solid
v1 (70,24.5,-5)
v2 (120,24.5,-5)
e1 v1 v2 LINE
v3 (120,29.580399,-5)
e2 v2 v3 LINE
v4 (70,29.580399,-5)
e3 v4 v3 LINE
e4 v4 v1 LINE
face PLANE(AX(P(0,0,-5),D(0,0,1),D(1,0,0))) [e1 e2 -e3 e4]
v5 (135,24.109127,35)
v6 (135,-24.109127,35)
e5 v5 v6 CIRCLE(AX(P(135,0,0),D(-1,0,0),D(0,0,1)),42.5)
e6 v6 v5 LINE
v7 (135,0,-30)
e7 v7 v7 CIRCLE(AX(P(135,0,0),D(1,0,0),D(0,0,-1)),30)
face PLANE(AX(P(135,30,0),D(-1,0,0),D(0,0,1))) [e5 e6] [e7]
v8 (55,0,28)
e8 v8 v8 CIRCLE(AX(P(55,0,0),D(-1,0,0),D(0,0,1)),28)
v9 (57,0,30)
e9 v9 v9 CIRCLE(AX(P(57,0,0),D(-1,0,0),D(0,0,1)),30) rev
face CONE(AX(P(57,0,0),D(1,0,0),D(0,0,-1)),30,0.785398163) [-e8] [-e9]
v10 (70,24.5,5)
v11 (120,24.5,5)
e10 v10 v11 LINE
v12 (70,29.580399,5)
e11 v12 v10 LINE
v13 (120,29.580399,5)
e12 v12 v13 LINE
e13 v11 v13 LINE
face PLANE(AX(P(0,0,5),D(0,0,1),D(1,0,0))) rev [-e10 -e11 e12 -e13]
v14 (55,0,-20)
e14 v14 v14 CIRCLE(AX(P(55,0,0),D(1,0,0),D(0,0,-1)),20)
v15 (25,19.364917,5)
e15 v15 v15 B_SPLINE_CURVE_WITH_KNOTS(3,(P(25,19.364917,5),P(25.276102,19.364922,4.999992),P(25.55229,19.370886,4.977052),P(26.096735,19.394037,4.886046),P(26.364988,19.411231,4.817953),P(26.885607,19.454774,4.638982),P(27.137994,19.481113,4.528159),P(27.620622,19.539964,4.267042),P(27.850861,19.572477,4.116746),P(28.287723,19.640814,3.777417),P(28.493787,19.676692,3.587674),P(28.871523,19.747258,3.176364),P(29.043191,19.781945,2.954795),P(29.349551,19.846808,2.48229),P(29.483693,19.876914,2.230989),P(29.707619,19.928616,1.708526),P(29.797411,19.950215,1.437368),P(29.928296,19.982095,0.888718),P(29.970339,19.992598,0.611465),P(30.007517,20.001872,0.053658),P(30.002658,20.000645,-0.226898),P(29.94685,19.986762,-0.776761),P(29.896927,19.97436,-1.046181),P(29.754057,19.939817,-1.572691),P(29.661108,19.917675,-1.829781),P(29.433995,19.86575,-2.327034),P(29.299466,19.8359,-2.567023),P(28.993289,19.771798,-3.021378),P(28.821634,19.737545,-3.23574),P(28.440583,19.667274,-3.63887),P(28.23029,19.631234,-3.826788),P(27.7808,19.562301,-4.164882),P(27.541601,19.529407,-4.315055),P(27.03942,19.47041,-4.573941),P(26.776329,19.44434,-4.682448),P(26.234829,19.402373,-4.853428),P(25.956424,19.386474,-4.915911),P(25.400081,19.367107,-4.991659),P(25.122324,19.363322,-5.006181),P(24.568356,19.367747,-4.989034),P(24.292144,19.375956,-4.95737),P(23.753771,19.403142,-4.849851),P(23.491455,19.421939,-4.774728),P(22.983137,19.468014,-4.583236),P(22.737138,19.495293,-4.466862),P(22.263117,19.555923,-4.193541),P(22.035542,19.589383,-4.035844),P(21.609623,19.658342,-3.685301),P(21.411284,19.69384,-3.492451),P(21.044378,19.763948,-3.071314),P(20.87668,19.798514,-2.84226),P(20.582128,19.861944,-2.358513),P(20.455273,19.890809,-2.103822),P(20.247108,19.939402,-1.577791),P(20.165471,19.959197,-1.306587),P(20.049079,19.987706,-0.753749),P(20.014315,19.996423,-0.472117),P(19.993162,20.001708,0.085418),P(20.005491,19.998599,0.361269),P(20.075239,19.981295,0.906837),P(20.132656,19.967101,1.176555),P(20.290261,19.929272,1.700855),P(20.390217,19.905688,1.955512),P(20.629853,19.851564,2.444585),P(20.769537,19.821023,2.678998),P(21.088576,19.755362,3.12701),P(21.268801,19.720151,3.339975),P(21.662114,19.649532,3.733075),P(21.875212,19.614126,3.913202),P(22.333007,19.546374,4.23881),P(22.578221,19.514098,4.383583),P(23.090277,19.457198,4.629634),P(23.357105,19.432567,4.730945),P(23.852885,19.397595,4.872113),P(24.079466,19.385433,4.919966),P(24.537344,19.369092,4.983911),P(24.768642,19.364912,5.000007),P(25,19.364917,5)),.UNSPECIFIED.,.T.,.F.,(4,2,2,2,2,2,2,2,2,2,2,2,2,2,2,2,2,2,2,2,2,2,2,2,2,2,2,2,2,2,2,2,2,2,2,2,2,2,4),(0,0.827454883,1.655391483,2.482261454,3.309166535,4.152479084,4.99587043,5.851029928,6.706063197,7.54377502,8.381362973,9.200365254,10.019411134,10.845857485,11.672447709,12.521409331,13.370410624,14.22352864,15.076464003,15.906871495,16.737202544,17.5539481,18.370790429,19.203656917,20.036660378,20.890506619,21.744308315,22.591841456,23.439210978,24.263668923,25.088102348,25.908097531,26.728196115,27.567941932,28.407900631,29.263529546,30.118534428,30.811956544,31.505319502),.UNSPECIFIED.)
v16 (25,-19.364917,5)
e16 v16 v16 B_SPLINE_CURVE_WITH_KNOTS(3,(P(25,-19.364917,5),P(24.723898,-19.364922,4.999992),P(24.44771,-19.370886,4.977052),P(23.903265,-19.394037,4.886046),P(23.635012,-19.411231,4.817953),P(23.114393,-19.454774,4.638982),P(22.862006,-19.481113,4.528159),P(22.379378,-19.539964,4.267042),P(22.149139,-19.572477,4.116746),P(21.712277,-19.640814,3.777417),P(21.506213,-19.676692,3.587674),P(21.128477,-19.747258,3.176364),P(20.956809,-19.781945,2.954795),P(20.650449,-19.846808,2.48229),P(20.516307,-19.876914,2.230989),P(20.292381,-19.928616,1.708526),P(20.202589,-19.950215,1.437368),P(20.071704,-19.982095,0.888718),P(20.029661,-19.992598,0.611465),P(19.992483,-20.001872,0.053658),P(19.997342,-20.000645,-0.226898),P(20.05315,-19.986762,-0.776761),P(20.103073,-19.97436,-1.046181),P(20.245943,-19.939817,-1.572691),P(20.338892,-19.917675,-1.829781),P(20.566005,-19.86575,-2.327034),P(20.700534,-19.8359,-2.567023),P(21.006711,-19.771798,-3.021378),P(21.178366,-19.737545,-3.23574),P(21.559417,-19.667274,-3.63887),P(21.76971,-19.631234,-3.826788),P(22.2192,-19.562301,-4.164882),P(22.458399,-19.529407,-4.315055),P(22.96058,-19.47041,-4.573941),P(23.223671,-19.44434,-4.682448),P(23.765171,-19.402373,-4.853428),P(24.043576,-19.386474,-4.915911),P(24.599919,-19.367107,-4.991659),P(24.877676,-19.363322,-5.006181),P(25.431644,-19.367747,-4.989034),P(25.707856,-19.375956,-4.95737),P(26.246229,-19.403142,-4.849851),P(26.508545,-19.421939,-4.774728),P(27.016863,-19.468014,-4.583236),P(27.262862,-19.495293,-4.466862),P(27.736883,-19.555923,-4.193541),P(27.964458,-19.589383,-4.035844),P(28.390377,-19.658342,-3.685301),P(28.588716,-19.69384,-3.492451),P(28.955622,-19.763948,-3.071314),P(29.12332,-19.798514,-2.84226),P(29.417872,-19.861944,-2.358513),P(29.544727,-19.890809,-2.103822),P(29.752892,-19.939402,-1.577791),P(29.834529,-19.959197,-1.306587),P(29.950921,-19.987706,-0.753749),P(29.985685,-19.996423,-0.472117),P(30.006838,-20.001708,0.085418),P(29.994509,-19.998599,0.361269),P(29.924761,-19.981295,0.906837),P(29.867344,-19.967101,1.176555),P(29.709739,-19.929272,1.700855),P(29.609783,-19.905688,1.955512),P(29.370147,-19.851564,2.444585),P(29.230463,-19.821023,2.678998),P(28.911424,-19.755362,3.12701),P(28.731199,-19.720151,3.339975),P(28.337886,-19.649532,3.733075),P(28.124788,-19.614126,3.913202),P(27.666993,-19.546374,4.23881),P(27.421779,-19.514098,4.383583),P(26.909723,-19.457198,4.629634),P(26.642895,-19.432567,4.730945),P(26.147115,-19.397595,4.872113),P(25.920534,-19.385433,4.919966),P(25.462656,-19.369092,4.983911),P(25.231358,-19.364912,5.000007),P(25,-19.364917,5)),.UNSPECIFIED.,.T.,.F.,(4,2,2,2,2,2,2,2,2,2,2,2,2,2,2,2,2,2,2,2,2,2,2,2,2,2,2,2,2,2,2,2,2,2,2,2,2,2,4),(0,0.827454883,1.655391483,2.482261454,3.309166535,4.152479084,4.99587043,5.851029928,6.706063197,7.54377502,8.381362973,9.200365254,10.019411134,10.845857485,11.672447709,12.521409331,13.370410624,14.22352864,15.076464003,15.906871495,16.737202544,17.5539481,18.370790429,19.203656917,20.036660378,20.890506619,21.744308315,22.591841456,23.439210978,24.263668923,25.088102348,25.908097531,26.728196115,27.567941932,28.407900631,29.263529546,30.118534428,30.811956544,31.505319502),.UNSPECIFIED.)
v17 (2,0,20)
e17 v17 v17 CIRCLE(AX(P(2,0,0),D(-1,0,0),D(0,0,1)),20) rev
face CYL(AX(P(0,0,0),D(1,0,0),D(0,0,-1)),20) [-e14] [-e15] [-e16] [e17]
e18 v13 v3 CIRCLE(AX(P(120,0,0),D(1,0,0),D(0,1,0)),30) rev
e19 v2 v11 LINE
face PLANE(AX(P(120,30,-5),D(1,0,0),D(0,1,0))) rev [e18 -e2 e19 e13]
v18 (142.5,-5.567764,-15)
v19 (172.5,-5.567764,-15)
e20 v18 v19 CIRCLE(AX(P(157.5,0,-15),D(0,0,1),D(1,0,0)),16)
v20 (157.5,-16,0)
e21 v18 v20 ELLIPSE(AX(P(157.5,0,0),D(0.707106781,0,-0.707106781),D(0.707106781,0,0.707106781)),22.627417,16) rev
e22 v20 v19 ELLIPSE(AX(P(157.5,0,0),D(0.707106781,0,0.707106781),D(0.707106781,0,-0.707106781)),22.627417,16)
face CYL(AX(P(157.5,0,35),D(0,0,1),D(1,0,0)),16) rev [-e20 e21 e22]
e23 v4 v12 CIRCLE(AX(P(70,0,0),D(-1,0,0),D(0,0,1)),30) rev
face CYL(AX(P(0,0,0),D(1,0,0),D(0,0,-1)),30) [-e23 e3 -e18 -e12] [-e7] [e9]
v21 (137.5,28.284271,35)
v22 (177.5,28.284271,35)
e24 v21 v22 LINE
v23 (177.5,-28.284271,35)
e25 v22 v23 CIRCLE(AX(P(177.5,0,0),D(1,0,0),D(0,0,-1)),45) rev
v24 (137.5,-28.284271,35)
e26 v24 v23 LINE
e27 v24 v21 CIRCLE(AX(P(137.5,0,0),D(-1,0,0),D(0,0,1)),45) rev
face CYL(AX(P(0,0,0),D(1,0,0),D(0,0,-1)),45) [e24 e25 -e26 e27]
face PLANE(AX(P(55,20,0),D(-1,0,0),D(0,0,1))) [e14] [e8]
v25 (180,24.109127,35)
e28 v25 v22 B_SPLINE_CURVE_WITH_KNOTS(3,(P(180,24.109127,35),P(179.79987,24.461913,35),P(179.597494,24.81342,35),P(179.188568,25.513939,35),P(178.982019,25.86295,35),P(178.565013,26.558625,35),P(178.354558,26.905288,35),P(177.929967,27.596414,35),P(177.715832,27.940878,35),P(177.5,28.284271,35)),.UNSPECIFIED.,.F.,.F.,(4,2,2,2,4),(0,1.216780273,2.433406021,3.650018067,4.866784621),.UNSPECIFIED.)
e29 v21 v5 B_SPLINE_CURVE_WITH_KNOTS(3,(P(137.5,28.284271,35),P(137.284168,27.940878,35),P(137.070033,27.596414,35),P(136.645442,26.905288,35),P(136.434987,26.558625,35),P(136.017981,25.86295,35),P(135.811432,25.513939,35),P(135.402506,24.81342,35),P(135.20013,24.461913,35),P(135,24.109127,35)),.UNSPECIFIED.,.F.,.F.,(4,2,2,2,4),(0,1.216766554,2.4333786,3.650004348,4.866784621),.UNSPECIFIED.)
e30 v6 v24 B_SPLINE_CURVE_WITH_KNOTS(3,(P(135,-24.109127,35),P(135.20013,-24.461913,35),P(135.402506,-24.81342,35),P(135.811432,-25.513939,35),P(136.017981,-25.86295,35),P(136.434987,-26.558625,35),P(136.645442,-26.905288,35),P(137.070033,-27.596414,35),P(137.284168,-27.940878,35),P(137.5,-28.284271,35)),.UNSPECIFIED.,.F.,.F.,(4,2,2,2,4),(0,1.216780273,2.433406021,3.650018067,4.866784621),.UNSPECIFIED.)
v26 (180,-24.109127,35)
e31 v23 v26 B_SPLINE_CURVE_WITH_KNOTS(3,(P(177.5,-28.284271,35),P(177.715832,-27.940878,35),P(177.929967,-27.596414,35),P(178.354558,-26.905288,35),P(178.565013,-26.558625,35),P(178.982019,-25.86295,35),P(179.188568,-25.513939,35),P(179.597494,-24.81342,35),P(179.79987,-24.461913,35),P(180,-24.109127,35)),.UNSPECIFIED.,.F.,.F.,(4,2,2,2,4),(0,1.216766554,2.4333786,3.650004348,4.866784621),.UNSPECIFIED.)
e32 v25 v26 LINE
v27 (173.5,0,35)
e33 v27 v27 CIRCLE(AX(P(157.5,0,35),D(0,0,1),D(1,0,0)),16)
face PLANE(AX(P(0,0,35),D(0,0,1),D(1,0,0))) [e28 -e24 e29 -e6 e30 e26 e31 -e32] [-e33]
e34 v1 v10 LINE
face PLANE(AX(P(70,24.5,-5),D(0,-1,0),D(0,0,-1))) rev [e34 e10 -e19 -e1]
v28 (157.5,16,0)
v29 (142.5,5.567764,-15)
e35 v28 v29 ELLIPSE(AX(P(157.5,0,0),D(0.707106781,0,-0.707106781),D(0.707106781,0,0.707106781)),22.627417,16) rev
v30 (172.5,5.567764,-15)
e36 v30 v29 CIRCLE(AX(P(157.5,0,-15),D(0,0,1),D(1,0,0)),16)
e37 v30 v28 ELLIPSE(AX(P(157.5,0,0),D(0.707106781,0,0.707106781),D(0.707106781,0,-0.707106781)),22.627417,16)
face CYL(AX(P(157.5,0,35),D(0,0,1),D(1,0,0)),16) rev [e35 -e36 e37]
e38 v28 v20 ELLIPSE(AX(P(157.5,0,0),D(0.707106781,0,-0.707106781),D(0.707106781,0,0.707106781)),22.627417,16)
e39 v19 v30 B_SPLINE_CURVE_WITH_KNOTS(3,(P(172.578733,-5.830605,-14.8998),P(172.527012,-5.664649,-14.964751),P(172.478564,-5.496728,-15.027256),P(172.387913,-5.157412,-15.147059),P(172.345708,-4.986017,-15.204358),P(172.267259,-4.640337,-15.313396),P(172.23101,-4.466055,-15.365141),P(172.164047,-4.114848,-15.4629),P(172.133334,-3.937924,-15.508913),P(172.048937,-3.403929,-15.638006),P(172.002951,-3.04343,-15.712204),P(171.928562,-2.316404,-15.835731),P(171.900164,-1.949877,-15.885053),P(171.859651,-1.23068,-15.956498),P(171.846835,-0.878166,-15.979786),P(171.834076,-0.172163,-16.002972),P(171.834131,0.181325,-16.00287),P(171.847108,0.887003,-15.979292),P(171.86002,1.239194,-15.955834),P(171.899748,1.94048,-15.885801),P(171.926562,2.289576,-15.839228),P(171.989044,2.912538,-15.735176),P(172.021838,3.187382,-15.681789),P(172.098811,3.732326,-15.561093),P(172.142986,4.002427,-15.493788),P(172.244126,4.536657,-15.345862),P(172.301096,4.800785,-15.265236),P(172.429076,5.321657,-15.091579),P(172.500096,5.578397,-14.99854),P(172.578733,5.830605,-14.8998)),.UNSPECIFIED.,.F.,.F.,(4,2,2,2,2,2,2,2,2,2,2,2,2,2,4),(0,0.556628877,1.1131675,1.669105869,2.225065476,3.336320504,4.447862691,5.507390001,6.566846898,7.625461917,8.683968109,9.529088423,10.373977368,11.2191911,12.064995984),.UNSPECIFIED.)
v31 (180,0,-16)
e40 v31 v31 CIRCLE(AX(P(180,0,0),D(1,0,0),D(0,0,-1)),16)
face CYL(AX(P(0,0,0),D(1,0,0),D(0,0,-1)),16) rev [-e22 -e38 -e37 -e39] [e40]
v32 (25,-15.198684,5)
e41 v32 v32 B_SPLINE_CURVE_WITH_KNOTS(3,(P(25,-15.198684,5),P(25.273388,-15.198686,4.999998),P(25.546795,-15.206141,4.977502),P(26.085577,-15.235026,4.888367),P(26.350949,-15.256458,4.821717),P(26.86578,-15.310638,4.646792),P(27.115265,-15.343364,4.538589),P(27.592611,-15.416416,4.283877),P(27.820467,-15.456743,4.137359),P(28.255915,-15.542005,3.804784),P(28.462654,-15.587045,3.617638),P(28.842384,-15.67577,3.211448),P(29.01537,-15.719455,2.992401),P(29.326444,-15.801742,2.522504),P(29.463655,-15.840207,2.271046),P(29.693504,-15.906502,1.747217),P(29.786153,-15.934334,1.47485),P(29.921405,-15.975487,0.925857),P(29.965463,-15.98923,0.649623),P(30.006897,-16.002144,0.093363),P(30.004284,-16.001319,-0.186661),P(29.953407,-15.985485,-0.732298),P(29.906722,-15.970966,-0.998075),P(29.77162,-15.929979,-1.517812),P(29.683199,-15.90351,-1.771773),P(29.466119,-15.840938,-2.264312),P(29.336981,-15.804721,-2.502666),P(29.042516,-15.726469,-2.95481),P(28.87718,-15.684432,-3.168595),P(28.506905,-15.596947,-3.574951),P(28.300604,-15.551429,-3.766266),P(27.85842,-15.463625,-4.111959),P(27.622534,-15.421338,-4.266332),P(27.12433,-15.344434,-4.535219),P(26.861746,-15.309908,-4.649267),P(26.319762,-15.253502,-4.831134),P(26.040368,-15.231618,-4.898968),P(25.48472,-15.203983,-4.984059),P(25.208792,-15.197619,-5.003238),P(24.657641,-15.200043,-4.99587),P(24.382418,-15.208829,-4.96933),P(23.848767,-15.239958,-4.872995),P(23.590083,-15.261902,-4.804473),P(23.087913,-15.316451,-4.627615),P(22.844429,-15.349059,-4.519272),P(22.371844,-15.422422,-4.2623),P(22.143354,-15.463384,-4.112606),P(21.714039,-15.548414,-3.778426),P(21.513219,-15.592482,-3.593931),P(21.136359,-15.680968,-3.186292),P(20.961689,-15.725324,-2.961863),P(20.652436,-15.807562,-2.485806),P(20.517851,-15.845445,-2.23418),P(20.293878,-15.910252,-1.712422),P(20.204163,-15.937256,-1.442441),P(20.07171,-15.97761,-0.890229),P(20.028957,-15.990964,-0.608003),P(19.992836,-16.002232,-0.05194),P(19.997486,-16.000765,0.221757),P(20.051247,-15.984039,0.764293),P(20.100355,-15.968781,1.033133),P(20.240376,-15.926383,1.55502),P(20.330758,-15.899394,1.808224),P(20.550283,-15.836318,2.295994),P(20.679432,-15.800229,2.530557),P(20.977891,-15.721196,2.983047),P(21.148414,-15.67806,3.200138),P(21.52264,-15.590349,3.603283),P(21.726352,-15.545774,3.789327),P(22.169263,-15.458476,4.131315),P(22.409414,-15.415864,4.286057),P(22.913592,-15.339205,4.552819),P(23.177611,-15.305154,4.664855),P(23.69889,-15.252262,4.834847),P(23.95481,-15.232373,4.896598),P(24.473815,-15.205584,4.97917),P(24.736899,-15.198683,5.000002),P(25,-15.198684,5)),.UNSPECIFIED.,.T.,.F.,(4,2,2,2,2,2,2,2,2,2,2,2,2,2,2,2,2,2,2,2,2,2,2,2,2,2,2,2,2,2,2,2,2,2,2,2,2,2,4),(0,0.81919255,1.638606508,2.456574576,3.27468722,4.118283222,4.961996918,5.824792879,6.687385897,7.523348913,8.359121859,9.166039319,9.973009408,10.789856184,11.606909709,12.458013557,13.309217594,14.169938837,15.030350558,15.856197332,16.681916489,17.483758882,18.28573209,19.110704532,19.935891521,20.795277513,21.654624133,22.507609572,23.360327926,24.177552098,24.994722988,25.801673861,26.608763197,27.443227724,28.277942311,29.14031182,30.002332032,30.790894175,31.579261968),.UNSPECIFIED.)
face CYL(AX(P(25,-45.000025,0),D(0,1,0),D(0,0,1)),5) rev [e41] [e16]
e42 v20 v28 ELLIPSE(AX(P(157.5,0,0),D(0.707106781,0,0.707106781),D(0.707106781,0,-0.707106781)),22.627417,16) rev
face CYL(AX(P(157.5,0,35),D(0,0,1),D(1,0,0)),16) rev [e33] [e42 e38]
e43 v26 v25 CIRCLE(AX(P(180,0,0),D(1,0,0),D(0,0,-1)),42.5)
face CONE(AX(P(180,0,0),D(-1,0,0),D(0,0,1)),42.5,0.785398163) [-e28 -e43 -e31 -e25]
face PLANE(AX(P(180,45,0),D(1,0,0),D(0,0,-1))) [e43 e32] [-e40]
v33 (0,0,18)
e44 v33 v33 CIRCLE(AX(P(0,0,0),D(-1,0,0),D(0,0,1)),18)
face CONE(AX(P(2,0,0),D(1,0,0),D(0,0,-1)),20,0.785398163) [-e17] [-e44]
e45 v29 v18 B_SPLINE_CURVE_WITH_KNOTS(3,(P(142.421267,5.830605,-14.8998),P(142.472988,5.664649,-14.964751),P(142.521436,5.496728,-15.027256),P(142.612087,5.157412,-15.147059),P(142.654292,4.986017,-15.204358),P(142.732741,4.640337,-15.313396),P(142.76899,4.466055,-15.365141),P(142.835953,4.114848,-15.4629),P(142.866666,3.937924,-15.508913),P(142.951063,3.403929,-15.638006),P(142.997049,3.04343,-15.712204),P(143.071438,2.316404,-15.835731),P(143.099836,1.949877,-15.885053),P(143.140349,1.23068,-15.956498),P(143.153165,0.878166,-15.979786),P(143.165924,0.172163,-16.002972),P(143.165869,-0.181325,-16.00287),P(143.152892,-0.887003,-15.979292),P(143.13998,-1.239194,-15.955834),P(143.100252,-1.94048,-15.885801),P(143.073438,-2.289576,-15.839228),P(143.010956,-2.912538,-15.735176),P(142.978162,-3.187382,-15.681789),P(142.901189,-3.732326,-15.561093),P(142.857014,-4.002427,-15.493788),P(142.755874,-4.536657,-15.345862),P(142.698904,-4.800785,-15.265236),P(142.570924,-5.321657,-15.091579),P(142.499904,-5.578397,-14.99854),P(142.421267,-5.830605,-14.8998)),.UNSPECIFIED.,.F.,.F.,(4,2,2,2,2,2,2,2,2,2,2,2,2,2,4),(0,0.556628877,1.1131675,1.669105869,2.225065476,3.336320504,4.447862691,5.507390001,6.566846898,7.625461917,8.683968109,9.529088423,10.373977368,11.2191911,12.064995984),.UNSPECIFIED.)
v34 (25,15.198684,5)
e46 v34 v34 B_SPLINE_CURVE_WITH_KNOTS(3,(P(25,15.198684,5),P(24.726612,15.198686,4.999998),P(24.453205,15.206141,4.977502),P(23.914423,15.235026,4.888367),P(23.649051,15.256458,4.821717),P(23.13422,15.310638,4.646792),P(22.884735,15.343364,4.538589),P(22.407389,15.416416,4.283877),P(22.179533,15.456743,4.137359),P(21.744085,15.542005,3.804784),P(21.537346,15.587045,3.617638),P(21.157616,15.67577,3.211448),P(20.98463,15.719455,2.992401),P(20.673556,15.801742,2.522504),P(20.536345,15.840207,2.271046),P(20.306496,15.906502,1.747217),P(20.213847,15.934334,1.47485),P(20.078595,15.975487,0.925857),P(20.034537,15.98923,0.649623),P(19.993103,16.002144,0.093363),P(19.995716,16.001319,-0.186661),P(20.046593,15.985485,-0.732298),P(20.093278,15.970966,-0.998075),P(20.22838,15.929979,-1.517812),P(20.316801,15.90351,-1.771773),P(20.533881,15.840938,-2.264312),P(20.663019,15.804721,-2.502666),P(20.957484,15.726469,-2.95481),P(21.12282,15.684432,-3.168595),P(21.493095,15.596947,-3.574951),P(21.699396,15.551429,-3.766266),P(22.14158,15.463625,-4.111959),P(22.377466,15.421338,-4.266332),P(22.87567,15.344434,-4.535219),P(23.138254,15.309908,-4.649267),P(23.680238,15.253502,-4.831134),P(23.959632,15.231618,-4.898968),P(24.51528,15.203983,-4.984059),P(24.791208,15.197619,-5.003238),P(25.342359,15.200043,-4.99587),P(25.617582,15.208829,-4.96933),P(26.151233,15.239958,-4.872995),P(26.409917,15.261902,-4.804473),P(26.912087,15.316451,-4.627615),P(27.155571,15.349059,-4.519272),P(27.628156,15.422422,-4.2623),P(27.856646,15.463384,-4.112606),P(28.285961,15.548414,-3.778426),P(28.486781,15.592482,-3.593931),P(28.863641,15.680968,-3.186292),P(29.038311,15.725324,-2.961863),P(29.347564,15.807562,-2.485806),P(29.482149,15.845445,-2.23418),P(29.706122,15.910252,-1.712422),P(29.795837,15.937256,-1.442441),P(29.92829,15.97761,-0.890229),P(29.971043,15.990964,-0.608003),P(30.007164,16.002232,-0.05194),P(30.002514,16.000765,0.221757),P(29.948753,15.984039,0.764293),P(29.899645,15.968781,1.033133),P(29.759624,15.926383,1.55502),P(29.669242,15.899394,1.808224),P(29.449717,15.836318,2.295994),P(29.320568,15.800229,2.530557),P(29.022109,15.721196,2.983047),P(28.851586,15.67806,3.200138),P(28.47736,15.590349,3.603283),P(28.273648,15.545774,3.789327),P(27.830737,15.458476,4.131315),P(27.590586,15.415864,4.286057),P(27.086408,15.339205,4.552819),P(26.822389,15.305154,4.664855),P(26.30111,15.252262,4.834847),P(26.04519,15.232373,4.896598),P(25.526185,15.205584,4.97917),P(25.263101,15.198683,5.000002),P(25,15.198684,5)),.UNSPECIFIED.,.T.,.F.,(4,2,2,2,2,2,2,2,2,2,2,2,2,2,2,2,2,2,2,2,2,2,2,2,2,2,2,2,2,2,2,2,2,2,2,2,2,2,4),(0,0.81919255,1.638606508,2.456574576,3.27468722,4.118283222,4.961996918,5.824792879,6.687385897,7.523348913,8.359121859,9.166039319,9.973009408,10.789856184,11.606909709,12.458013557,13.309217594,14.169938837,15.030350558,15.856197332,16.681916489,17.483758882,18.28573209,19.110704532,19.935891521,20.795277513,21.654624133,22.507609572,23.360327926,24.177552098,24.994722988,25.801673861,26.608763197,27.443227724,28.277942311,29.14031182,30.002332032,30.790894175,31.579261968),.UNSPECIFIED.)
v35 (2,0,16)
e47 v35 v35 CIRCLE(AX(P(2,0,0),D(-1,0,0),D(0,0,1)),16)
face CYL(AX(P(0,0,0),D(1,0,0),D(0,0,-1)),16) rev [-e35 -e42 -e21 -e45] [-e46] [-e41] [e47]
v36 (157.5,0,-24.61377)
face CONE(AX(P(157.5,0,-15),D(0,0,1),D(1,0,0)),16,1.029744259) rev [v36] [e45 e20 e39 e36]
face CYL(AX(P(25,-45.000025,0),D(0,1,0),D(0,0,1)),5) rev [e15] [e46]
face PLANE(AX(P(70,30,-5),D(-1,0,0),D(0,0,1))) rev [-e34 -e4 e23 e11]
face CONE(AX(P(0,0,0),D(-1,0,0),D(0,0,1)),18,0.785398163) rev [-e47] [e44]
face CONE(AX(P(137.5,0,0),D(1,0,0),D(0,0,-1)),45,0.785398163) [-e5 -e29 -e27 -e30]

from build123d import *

# Parameters (mm, degrees)
CUT_EXTRUDE_9_DEPTH         = 191.91883092
CUT_EXTRUDE_9_DEPTH_BACK    = 191.91883092
SKETCH_6_W                  = 50
SKETCH_6_H                  = 5.5
CUT_EXTRUDE_4_DEPTH         = 5
CUT_EXTRUDE_10_DEPTH        = 191.91883092
CUT_EXTRUDE_10_DEPTH_BACK   = 191.91883092
SKETCH_16_R                 = 5
HOLE_WIZARD_0_15_32_1_D     = 32
HOLE_WIZARD_0_15_32_1_DEPTH = 50
HOLE_WIZARD_0_15_32_1_TIP   = 9.613769904
CHAMFER_3_SIZE              = 2
CHAMFER_4_SIZE              = 2.5
CHAMFER_5_SIZE              = 2


with BuildPart() as part:
    # Эскиз1 → Повернуть1 (revolve)
    with BuildSketch(Plane.XY, mode=Mode.PRIVATE) as revolve_1_sk:
        Polygon((0, 16), (0, 20), (55, 20), (55, 30), (135, 30), (135, 45), (180, 45), (180, 16), align=None)
    revolve(revolve_1_sk.sketch.rotate(Axis((0, 0, 0), (-1, 0, 0)), 90), axis=Axis((0, 0, 0), (-1, 0, 0)))

    # Эскиз15 → Вырез-Вытянуть9 (cut, two sides: drawn at the far end of the back side and taken through both)
    with BuildSketch(Plane(origin=(180, 0, 0), x_dir=(0, 0, -1), z_dir=(1, 0, 0)).offset(-CUT_EXTRUDE_9_DEPTH_BACK)):
        with BuildLine():
            Line((-35, -28.284271247), (-35, 28.284271247))
            ThreePointArc((-35, 28.284271247), (-45, 0), (-35, -28.284271247))
        make_face()
    extrude(amount=CUT_EXTRUDE_9_DEPTH + CUT_EXTRUDE_9_DEPTH_BACK, mode=Mode.SUBTRACT)

    # Эскиз6 → Вырез-Вытянуть4 (cut, symmetric)
    with BuildSketch(Plane.XY):
        with Locations((95, 27.25)):
            Rectangle(SKETCH_6_W, SKETCH_6_H)
    extrude(amount=CUT_EXTRUDE_4_DEPTH, both=True, mode=Mode.SUBTRACT)

    # Эскиз16 → Вырез-Вытянуть10 (cut, two sides: drawn at the far end of the back side and taken through both)
    with BuildSketch(Plane(origin=(0, 0, 0), x_dir=(1, 0, 0), z_dir=(0, 1, 0)).offset(-CUT_EXTRUDE_10_DEPTH_BACK)):
        with Locations(Location((25, 0, 0), (0, 0, 270))):
            Circle(SKETCH_16_R)
    extrude(amount=CUT_EXTRUDE_10_DEPTH + CUT_EXTRUDE_10_DEPTH_BACK, mode=Mode.SUBTRACT)

    # Диаметр отверстия Ø0.15 (32)1
    with Locations(Plane.XY.offset(35)):
        with Locations((157.5, 0)):
            Hole(HOLE_WIZARD_0_15_32_1_D / 2, depth=HOLE_WIZARD_0_15_32_1_DEPTH)
            with Locations((0, 0, -(HOLE_WIZARD_0_15_32_1_DEPTH + HOLE_WIZARD_0_15_32_1_TIP / 2))):  # 118° drill point
                Cone(0, HOLE_WIZARD_0_15_32_1_D / 2, HOLE_WIZARD_0_15_32_1_TIP, mode=Mode.SUBTRACT)

    # Фаска3
    chamfer_3_edges = [part.edges().sort_by_distance(p)[0] for p in [
        (0, 0, 16),
        (0, 0, 20),
    ]]
    chamfer(chamfer_3_edges, length=CHAMFER_3_SIZE - 0.0001)  # a hair under: the kernel refuses the full size

    # Фаска4
    chamfer_4_edges = [part.edges().sort_by_distance(p)[0] for p in [
        (180, 0, -45),
        (135, 0, -45),
    ]]
    chamfer(chamfer_4_edges, length=CHAMFER_4_SIZE)

    # Фаска5
    chamfer_5_edges = [part.edges().sort_by_distance(p)[0] for p in [
        (55, 0, 30),
    ]]
    chamfer(chamfer_5_edges, length=CHAMFER_5_SIZE)


solid = part.part
